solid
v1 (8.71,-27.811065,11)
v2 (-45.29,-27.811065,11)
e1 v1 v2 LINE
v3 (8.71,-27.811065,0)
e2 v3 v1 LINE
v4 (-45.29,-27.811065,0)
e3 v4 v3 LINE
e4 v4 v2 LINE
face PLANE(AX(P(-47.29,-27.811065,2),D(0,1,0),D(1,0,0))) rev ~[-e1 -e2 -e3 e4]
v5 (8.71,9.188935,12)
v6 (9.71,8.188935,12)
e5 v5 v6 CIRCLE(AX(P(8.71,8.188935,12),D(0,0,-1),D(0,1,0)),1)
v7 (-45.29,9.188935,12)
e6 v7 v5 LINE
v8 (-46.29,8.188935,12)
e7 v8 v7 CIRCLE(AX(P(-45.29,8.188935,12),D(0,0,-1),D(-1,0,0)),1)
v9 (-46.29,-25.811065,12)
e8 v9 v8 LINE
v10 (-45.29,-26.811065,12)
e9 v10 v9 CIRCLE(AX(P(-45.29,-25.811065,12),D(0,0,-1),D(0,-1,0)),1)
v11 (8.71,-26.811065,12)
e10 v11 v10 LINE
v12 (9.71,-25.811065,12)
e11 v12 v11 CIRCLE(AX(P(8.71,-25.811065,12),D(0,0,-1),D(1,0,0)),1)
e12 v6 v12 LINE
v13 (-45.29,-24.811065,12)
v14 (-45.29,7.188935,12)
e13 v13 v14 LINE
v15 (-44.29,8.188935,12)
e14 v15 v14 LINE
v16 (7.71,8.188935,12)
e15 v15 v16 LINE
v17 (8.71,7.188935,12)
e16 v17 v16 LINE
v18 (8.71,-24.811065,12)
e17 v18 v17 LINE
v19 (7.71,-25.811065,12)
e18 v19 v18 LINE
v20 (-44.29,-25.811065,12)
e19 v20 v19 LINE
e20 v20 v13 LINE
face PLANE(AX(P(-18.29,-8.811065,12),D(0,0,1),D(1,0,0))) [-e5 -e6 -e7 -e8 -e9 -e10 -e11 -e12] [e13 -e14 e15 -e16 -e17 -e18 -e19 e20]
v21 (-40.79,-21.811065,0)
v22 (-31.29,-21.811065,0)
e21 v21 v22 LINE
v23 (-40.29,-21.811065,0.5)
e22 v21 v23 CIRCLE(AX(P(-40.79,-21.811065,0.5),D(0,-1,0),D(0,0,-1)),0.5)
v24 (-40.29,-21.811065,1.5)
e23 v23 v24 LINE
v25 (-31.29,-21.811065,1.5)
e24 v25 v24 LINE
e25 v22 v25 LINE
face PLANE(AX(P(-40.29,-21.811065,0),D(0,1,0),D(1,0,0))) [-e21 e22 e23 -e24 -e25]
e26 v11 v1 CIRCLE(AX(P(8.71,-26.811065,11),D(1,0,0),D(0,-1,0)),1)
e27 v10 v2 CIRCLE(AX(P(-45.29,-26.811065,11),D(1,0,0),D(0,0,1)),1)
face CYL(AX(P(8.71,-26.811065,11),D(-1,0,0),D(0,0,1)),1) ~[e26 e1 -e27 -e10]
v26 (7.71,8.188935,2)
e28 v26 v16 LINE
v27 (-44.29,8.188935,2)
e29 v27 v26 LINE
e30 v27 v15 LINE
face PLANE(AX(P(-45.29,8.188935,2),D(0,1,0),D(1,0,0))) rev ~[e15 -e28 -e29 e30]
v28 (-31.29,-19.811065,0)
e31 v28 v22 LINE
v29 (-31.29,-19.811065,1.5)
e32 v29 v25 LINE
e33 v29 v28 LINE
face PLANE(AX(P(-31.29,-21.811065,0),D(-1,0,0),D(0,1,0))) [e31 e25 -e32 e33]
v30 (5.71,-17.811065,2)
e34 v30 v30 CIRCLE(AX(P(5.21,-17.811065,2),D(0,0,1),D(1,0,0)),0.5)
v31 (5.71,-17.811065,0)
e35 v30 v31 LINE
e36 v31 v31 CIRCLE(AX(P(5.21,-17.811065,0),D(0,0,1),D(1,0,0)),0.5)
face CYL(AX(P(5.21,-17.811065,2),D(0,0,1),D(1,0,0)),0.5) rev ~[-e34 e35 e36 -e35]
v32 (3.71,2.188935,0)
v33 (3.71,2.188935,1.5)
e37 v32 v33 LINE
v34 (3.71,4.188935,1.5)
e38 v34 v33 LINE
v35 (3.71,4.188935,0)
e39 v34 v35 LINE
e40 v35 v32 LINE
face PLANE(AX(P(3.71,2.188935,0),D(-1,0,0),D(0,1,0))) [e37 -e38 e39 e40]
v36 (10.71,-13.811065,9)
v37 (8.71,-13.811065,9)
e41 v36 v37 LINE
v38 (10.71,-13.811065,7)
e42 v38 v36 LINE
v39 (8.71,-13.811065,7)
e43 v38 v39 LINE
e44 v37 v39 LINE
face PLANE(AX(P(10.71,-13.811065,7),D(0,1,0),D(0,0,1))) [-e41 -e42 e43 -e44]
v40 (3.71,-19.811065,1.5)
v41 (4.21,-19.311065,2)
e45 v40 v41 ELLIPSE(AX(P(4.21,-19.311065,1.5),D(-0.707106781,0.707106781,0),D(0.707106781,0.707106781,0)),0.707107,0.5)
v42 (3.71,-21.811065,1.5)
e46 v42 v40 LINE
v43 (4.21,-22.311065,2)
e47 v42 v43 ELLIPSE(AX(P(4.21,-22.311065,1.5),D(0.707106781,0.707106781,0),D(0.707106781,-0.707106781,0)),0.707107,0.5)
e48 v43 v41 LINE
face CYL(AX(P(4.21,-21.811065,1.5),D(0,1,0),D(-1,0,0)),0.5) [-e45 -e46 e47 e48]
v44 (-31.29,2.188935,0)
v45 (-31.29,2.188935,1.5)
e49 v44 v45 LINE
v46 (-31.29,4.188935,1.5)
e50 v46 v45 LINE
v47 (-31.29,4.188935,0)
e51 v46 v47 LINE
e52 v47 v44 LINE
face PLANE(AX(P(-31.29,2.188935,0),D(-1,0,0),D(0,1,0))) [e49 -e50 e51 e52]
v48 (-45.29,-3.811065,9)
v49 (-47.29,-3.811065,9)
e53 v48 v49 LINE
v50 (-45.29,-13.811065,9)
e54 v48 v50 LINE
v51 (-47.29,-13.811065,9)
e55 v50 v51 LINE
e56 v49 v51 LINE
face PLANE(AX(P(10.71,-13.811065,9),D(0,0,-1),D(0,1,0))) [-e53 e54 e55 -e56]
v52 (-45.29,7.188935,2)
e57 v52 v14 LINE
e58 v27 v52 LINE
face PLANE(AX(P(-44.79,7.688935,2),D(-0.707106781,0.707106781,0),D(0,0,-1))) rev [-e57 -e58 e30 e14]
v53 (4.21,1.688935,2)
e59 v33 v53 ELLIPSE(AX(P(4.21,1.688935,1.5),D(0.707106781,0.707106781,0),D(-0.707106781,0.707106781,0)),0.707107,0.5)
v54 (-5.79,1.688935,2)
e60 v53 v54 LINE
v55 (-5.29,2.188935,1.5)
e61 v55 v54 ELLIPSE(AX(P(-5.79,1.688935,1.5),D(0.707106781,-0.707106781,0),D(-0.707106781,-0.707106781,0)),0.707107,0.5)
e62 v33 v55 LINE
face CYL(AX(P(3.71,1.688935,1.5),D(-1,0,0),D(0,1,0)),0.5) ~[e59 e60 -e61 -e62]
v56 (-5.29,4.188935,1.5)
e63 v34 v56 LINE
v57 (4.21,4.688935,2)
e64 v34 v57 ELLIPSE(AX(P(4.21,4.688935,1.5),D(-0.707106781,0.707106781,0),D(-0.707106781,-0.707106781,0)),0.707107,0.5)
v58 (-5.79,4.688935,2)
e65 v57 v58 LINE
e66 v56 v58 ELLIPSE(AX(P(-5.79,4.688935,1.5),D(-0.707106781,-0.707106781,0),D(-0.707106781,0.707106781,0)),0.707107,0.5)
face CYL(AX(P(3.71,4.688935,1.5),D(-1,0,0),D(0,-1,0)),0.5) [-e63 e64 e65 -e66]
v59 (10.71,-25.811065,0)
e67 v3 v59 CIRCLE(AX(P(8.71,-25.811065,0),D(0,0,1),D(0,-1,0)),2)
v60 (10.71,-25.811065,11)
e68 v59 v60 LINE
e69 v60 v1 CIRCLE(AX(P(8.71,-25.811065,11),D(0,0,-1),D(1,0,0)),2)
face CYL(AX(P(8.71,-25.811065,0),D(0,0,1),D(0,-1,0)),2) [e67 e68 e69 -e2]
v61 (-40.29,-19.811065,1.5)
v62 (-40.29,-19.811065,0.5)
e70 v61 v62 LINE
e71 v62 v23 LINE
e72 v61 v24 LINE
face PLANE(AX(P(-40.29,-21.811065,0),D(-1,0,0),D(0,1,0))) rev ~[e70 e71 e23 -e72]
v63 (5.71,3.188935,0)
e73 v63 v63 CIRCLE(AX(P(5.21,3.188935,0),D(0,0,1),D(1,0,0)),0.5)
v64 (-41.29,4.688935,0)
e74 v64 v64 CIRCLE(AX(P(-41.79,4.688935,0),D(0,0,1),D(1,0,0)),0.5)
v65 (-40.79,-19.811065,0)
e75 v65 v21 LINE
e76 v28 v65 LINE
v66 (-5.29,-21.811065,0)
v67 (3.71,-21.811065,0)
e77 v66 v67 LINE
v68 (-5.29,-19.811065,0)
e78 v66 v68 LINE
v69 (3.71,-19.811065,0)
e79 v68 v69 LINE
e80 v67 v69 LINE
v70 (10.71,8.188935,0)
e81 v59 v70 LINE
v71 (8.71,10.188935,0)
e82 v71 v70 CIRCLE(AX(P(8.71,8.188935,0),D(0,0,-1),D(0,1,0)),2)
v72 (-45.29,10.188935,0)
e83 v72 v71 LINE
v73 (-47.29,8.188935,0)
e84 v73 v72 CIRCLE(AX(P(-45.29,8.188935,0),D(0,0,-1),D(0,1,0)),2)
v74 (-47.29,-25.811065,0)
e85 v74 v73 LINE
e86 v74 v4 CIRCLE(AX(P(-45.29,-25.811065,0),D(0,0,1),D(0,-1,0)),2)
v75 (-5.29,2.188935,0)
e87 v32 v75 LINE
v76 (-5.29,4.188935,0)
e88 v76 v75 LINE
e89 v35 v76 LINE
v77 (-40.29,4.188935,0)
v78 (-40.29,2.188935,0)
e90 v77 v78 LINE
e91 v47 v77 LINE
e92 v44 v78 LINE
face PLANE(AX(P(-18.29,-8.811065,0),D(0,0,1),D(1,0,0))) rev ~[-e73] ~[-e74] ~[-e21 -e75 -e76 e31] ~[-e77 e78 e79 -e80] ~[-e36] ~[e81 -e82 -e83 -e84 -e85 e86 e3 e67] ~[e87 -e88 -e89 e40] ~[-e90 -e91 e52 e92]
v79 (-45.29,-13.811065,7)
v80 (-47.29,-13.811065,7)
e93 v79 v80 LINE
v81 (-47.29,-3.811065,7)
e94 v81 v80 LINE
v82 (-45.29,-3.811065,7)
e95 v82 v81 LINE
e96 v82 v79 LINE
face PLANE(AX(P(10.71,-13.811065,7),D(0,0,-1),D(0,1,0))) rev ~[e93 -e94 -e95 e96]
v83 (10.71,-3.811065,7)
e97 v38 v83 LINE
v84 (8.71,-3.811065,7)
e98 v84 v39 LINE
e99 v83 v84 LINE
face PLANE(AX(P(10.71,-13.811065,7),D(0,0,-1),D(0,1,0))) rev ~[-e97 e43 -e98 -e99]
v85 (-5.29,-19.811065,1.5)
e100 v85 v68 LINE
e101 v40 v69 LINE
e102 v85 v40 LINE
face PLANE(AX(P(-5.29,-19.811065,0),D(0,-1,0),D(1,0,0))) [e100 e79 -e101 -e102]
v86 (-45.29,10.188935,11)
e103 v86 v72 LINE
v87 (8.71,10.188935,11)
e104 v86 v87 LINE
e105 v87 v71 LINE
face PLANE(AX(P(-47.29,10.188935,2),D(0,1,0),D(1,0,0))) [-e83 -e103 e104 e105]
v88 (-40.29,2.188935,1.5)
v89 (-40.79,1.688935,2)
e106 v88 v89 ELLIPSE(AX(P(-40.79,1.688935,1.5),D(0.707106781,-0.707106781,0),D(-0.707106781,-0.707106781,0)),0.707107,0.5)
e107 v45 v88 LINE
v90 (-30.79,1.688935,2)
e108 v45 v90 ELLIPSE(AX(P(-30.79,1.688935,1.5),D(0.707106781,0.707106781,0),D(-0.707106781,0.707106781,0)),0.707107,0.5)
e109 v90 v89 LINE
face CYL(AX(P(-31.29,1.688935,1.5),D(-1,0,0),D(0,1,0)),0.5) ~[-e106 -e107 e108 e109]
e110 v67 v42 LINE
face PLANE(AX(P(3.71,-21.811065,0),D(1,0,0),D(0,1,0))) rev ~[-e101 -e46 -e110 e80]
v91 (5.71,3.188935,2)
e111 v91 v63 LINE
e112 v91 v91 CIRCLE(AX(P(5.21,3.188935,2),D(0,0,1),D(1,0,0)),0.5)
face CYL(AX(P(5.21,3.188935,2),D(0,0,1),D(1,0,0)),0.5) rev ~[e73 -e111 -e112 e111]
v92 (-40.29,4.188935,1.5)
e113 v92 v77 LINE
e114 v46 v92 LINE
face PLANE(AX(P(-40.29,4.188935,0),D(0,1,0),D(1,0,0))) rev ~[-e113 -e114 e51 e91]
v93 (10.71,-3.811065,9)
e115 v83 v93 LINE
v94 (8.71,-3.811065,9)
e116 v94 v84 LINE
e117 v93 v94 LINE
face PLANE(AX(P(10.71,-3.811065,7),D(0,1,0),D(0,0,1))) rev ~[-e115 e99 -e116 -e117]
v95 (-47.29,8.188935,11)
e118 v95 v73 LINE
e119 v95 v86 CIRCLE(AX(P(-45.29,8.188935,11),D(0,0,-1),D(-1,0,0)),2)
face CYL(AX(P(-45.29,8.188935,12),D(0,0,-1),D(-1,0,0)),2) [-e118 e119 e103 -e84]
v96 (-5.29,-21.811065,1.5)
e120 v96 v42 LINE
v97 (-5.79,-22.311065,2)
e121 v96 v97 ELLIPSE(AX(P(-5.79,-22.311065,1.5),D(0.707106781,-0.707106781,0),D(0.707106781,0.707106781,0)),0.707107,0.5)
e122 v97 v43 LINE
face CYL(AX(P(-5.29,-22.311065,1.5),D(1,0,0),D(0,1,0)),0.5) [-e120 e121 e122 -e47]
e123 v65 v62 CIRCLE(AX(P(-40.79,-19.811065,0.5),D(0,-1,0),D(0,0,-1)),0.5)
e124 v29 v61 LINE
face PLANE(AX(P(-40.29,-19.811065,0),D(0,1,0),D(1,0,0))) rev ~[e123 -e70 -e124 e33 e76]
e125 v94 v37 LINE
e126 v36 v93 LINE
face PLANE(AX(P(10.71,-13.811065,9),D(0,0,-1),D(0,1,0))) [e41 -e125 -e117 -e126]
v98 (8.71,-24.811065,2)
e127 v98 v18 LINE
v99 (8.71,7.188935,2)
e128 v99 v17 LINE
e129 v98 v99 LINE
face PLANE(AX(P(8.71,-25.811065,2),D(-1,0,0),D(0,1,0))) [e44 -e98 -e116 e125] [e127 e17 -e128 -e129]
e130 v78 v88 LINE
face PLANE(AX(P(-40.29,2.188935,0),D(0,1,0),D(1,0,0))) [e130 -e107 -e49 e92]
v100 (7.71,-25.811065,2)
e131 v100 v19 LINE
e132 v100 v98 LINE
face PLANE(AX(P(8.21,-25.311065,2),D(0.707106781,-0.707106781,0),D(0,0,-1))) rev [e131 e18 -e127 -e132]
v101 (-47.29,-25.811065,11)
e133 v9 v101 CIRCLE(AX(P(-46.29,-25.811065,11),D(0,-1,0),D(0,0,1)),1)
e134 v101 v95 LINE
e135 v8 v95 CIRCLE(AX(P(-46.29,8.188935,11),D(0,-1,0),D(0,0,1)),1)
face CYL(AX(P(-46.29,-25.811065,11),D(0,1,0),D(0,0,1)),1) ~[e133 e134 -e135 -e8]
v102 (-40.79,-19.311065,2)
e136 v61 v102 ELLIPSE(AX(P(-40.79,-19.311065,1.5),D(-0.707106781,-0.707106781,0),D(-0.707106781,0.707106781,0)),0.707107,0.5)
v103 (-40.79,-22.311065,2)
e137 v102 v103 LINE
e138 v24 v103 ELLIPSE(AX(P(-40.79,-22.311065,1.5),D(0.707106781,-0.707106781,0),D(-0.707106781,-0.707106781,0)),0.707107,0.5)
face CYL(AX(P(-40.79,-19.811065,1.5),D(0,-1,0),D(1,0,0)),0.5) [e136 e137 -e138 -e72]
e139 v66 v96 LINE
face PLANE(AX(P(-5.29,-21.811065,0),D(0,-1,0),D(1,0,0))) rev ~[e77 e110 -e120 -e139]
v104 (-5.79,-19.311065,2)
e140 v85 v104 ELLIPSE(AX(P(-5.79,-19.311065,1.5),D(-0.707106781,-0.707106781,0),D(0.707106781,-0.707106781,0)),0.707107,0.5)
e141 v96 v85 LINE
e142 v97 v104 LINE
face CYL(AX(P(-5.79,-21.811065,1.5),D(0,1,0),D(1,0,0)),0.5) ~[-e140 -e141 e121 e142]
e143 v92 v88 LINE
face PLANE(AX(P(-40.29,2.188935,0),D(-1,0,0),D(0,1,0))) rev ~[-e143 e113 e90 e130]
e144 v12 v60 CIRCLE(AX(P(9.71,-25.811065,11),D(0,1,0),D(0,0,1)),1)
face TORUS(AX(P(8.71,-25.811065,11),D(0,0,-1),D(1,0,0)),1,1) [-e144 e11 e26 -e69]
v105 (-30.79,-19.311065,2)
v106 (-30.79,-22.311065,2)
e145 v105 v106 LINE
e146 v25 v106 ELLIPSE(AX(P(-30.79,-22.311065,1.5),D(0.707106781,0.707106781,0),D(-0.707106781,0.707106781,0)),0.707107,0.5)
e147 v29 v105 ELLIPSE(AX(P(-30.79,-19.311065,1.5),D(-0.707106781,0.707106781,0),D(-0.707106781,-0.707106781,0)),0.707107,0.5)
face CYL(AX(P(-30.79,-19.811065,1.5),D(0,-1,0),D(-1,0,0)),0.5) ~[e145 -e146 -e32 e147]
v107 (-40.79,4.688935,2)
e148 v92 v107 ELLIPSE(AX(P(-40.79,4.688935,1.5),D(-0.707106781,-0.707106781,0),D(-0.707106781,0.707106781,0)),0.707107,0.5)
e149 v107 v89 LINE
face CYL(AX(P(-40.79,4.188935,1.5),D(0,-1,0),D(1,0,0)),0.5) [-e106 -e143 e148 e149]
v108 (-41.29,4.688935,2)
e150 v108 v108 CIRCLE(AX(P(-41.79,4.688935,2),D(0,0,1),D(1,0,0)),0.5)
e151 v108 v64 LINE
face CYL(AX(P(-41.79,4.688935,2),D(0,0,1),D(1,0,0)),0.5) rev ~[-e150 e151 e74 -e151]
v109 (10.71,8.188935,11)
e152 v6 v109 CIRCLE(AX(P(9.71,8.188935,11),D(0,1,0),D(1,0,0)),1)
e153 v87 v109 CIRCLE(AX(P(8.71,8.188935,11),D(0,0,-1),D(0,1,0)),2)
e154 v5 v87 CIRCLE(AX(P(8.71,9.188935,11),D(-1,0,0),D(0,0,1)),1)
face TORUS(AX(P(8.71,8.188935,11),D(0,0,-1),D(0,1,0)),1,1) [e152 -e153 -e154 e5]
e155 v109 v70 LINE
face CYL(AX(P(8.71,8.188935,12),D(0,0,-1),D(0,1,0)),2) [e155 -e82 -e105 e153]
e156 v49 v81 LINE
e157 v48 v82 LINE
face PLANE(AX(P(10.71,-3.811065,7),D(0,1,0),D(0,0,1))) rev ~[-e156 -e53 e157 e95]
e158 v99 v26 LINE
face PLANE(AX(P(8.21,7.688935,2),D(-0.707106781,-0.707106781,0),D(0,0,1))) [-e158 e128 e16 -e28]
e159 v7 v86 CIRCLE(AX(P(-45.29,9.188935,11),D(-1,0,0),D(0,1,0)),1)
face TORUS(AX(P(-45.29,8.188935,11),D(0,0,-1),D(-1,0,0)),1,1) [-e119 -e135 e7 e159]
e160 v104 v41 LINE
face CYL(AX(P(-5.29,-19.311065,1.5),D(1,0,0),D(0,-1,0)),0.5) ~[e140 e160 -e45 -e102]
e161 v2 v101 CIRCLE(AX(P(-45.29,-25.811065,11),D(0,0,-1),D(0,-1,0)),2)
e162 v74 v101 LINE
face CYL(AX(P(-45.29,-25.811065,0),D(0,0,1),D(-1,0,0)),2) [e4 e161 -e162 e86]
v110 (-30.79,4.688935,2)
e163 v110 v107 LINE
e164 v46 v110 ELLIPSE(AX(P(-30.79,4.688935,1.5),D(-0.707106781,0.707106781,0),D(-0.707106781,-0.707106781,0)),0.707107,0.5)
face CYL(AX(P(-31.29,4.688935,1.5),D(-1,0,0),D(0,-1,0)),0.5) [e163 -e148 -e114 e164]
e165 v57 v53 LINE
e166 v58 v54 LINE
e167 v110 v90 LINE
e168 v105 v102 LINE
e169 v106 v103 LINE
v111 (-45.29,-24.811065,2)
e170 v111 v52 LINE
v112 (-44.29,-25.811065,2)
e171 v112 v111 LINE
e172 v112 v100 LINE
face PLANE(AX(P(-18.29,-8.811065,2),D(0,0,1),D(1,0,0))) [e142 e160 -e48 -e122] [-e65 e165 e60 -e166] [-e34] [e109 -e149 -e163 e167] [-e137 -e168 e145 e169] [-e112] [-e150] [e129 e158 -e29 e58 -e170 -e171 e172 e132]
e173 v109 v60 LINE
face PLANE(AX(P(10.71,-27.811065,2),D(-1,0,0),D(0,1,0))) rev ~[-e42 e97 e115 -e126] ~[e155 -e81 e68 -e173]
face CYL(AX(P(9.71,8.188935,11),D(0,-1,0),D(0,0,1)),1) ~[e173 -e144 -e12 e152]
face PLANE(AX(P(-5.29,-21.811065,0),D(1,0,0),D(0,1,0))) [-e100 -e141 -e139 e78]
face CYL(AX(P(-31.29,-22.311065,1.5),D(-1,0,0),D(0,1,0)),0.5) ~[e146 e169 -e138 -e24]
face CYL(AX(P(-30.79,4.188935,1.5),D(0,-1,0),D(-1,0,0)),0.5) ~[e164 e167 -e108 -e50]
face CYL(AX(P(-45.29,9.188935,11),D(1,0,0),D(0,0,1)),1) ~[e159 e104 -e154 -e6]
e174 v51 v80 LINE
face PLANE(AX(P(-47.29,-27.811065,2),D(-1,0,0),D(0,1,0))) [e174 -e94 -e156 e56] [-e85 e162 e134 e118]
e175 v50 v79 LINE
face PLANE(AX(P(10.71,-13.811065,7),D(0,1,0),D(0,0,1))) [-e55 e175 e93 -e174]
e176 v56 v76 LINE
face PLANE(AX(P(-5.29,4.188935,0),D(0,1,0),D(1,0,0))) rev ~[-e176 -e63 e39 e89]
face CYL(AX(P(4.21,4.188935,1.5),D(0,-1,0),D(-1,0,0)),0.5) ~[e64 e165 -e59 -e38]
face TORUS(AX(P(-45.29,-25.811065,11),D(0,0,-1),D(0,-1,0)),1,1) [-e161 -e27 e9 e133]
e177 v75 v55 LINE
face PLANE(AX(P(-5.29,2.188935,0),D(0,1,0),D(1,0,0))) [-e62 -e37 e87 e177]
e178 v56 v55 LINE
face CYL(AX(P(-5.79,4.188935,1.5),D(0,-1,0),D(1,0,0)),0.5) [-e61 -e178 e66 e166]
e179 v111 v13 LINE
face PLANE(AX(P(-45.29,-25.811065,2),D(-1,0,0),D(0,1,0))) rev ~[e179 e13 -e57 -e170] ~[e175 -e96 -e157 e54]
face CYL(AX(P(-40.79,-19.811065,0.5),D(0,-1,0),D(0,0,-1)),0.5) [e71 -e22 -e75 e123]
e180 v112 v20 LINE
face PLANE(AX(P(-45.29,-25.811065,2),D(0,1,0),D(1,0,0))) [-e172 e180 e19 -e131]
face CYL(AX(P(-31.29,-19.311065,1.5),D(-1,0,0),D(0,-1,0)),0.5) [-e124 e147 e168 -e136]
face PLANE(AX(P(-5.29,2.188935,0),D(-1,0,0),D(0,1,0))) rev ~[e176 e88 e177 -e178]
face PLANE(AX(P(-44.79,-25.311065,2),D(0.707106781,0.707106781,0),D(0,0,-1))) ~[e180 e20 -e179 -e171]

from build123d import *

# Parameters (mm, degrees)
F0_W      = 58
F0_H      = 38
F1_DEPTH  = 2
F2_W      = 58
F2_H      = 38
F2_W_2    = 54
F2_H_2    = 34
F3_DEPTH  = 10
F5_W      = 9
F5_H      = 2
F6_DEPTH  = 12.5
F7_R      = 2
F8_R      = 0.5
F9_R      = 1
F10_W     = 10
F10_H     = 2
F11_DEPTH = 58.0010001
F12_SIZE  = 1
F14_R     = 0.5
F15_DEPTH = 25


with BuildPart() as f1:
    # F0 (on Top) → F1 (new body)
    with BuildSketch(Plane.XY):
        with Locations((-18.2900002897, -8.8110647003)):
            Rectangle(F0_W, F0_H)
    extrude(amount=F1_DEPTH)

    # F2 (on face) → F3 (join)
    with BuildSketch(Plane.XY.offset(2)):
        with Locations((-18.2900002897, -8.8110647003)):
            Rectangle(F2_W, F2_H)
        with Locations((-18.2900002897, -8.8110647003)):
            Rectangle(F2_W_2, F2_H_2, mode=Mode.SUBTRACT)
    extrude(amount=F3_DEPTH)

    # F5 (on Top) → F6 (cut, symmetric)
    with BuildSketch(Plane.XY):
        with Locations((-35.7900002897, -20.8110647003)):
            Rectangle(F5_W, F5_H)
        with Locations((-35.7900002897, 3.1889352997)):
            Rectangle(F5_W, F5_H)
        with Locations((-0.7900002897, 3.1889352997)):
            Rectangle(F5_W, F5_H)
        with Locations((-0.7900002897, -20.8110647003)):
            Rectangle(F5_W, F5_H)
    extrude(amount=F6_DEPTH, both=True, mode=Mode.SUBTRACT)

    # F7
    f7_edges = [f1.edges().sort_by_distance(p)[0] for p in [
        (-47.29, -27.811065, 6),
        (10.71, -27.811065, 6),
        (10.71, 10.188935, 6),
        (-47.29, 10.188935, 6),
    ]]
    fillet(f7_edges, radius=F7_R)

    # F8
    f8_edges = [f1.edges().sort_by_distance(p)[0] for p in [
        (-0.79, 2.188935, 2),
        (-0.79, 4.188935, 2),
        (3.71, 3.188935, 2),
        (-5.29, 3.188935, 2),
        (-35.79, 2.188935, 2),
        (-35.79, 4.188935, 2),
        (-31.29, 3.188935, 2),
        (-40.29, 3.188935, 2),
        (-35.79, -19.811065, 2),
        (-35.79, -21.811065, 2),
        (-40.29, -20.811065, 0),
        (-31.29, -20.811065, 2),
        (-40.29, -20.811065, 2),
        (-0.79, -21.811065, 2),
        (-0.79, -19.811065, 2),
        (-5.29, -20.811065, 2),
        (3.71, -20.811065, 2),
    ]]
    fillet(f8_edges, radius=F8_R)

    # F9
    f9_edges = [f1.edges().sort_by_distance(p)[0] for p in [
        (-47.29, -8.811065, 12),
        (-18.29, -27.811065, 12),
        (10.71, -8.811065, 12),
        (-18.29, 10.188935, 12),
        (10.124213, 9.603149, 12),
        (-46.704214, 9.603149, 12),
        (10.124213, -27.225278, 12),
        (-46.704214, -27.225278, 12),
    ]]
    fillet(f9_edges, radius=F9_R)

    # F10 (on face) → F11 (cut, through all)
    with BuildSketch(Plane.YZ.offset(10.7099997103)):
        with Locations((-8.8110647003, 8)):
            Rectangle(F10_W, F10_H)
    extrude(amount=-F11_DEPTH, mode=Mode.SUBTRACT)

    # F12
    f12_edges = [f1.edges().sort_by_distance(p)[0] for p in [
        (-45.29, 8.188935, 7),
        (8.71, 8.188935, 7),
        (-45.29, -25.811065, 7),
        (8.71, -25.811065, 7),
    ]]
    chamfer(f12_edges, length=F12_SIZE)

    # F14 (on face) → F15 (cut)
    with BuildSketch(Plane.XY.offset(2)):
        with Locations((-41.7900002897, 4.6889352997)):
            Circle(F14_R)
        with Locations((5.2099997103, 3.1889352997)):
            Circle(F14_R)
        with Locations((5.2099997103, -17.8110647003)):
            Circle(F14_R)
    extrude(amount=-F15_DEPTH, mode=Mode.SUBTRACT)


solid = f1.part
